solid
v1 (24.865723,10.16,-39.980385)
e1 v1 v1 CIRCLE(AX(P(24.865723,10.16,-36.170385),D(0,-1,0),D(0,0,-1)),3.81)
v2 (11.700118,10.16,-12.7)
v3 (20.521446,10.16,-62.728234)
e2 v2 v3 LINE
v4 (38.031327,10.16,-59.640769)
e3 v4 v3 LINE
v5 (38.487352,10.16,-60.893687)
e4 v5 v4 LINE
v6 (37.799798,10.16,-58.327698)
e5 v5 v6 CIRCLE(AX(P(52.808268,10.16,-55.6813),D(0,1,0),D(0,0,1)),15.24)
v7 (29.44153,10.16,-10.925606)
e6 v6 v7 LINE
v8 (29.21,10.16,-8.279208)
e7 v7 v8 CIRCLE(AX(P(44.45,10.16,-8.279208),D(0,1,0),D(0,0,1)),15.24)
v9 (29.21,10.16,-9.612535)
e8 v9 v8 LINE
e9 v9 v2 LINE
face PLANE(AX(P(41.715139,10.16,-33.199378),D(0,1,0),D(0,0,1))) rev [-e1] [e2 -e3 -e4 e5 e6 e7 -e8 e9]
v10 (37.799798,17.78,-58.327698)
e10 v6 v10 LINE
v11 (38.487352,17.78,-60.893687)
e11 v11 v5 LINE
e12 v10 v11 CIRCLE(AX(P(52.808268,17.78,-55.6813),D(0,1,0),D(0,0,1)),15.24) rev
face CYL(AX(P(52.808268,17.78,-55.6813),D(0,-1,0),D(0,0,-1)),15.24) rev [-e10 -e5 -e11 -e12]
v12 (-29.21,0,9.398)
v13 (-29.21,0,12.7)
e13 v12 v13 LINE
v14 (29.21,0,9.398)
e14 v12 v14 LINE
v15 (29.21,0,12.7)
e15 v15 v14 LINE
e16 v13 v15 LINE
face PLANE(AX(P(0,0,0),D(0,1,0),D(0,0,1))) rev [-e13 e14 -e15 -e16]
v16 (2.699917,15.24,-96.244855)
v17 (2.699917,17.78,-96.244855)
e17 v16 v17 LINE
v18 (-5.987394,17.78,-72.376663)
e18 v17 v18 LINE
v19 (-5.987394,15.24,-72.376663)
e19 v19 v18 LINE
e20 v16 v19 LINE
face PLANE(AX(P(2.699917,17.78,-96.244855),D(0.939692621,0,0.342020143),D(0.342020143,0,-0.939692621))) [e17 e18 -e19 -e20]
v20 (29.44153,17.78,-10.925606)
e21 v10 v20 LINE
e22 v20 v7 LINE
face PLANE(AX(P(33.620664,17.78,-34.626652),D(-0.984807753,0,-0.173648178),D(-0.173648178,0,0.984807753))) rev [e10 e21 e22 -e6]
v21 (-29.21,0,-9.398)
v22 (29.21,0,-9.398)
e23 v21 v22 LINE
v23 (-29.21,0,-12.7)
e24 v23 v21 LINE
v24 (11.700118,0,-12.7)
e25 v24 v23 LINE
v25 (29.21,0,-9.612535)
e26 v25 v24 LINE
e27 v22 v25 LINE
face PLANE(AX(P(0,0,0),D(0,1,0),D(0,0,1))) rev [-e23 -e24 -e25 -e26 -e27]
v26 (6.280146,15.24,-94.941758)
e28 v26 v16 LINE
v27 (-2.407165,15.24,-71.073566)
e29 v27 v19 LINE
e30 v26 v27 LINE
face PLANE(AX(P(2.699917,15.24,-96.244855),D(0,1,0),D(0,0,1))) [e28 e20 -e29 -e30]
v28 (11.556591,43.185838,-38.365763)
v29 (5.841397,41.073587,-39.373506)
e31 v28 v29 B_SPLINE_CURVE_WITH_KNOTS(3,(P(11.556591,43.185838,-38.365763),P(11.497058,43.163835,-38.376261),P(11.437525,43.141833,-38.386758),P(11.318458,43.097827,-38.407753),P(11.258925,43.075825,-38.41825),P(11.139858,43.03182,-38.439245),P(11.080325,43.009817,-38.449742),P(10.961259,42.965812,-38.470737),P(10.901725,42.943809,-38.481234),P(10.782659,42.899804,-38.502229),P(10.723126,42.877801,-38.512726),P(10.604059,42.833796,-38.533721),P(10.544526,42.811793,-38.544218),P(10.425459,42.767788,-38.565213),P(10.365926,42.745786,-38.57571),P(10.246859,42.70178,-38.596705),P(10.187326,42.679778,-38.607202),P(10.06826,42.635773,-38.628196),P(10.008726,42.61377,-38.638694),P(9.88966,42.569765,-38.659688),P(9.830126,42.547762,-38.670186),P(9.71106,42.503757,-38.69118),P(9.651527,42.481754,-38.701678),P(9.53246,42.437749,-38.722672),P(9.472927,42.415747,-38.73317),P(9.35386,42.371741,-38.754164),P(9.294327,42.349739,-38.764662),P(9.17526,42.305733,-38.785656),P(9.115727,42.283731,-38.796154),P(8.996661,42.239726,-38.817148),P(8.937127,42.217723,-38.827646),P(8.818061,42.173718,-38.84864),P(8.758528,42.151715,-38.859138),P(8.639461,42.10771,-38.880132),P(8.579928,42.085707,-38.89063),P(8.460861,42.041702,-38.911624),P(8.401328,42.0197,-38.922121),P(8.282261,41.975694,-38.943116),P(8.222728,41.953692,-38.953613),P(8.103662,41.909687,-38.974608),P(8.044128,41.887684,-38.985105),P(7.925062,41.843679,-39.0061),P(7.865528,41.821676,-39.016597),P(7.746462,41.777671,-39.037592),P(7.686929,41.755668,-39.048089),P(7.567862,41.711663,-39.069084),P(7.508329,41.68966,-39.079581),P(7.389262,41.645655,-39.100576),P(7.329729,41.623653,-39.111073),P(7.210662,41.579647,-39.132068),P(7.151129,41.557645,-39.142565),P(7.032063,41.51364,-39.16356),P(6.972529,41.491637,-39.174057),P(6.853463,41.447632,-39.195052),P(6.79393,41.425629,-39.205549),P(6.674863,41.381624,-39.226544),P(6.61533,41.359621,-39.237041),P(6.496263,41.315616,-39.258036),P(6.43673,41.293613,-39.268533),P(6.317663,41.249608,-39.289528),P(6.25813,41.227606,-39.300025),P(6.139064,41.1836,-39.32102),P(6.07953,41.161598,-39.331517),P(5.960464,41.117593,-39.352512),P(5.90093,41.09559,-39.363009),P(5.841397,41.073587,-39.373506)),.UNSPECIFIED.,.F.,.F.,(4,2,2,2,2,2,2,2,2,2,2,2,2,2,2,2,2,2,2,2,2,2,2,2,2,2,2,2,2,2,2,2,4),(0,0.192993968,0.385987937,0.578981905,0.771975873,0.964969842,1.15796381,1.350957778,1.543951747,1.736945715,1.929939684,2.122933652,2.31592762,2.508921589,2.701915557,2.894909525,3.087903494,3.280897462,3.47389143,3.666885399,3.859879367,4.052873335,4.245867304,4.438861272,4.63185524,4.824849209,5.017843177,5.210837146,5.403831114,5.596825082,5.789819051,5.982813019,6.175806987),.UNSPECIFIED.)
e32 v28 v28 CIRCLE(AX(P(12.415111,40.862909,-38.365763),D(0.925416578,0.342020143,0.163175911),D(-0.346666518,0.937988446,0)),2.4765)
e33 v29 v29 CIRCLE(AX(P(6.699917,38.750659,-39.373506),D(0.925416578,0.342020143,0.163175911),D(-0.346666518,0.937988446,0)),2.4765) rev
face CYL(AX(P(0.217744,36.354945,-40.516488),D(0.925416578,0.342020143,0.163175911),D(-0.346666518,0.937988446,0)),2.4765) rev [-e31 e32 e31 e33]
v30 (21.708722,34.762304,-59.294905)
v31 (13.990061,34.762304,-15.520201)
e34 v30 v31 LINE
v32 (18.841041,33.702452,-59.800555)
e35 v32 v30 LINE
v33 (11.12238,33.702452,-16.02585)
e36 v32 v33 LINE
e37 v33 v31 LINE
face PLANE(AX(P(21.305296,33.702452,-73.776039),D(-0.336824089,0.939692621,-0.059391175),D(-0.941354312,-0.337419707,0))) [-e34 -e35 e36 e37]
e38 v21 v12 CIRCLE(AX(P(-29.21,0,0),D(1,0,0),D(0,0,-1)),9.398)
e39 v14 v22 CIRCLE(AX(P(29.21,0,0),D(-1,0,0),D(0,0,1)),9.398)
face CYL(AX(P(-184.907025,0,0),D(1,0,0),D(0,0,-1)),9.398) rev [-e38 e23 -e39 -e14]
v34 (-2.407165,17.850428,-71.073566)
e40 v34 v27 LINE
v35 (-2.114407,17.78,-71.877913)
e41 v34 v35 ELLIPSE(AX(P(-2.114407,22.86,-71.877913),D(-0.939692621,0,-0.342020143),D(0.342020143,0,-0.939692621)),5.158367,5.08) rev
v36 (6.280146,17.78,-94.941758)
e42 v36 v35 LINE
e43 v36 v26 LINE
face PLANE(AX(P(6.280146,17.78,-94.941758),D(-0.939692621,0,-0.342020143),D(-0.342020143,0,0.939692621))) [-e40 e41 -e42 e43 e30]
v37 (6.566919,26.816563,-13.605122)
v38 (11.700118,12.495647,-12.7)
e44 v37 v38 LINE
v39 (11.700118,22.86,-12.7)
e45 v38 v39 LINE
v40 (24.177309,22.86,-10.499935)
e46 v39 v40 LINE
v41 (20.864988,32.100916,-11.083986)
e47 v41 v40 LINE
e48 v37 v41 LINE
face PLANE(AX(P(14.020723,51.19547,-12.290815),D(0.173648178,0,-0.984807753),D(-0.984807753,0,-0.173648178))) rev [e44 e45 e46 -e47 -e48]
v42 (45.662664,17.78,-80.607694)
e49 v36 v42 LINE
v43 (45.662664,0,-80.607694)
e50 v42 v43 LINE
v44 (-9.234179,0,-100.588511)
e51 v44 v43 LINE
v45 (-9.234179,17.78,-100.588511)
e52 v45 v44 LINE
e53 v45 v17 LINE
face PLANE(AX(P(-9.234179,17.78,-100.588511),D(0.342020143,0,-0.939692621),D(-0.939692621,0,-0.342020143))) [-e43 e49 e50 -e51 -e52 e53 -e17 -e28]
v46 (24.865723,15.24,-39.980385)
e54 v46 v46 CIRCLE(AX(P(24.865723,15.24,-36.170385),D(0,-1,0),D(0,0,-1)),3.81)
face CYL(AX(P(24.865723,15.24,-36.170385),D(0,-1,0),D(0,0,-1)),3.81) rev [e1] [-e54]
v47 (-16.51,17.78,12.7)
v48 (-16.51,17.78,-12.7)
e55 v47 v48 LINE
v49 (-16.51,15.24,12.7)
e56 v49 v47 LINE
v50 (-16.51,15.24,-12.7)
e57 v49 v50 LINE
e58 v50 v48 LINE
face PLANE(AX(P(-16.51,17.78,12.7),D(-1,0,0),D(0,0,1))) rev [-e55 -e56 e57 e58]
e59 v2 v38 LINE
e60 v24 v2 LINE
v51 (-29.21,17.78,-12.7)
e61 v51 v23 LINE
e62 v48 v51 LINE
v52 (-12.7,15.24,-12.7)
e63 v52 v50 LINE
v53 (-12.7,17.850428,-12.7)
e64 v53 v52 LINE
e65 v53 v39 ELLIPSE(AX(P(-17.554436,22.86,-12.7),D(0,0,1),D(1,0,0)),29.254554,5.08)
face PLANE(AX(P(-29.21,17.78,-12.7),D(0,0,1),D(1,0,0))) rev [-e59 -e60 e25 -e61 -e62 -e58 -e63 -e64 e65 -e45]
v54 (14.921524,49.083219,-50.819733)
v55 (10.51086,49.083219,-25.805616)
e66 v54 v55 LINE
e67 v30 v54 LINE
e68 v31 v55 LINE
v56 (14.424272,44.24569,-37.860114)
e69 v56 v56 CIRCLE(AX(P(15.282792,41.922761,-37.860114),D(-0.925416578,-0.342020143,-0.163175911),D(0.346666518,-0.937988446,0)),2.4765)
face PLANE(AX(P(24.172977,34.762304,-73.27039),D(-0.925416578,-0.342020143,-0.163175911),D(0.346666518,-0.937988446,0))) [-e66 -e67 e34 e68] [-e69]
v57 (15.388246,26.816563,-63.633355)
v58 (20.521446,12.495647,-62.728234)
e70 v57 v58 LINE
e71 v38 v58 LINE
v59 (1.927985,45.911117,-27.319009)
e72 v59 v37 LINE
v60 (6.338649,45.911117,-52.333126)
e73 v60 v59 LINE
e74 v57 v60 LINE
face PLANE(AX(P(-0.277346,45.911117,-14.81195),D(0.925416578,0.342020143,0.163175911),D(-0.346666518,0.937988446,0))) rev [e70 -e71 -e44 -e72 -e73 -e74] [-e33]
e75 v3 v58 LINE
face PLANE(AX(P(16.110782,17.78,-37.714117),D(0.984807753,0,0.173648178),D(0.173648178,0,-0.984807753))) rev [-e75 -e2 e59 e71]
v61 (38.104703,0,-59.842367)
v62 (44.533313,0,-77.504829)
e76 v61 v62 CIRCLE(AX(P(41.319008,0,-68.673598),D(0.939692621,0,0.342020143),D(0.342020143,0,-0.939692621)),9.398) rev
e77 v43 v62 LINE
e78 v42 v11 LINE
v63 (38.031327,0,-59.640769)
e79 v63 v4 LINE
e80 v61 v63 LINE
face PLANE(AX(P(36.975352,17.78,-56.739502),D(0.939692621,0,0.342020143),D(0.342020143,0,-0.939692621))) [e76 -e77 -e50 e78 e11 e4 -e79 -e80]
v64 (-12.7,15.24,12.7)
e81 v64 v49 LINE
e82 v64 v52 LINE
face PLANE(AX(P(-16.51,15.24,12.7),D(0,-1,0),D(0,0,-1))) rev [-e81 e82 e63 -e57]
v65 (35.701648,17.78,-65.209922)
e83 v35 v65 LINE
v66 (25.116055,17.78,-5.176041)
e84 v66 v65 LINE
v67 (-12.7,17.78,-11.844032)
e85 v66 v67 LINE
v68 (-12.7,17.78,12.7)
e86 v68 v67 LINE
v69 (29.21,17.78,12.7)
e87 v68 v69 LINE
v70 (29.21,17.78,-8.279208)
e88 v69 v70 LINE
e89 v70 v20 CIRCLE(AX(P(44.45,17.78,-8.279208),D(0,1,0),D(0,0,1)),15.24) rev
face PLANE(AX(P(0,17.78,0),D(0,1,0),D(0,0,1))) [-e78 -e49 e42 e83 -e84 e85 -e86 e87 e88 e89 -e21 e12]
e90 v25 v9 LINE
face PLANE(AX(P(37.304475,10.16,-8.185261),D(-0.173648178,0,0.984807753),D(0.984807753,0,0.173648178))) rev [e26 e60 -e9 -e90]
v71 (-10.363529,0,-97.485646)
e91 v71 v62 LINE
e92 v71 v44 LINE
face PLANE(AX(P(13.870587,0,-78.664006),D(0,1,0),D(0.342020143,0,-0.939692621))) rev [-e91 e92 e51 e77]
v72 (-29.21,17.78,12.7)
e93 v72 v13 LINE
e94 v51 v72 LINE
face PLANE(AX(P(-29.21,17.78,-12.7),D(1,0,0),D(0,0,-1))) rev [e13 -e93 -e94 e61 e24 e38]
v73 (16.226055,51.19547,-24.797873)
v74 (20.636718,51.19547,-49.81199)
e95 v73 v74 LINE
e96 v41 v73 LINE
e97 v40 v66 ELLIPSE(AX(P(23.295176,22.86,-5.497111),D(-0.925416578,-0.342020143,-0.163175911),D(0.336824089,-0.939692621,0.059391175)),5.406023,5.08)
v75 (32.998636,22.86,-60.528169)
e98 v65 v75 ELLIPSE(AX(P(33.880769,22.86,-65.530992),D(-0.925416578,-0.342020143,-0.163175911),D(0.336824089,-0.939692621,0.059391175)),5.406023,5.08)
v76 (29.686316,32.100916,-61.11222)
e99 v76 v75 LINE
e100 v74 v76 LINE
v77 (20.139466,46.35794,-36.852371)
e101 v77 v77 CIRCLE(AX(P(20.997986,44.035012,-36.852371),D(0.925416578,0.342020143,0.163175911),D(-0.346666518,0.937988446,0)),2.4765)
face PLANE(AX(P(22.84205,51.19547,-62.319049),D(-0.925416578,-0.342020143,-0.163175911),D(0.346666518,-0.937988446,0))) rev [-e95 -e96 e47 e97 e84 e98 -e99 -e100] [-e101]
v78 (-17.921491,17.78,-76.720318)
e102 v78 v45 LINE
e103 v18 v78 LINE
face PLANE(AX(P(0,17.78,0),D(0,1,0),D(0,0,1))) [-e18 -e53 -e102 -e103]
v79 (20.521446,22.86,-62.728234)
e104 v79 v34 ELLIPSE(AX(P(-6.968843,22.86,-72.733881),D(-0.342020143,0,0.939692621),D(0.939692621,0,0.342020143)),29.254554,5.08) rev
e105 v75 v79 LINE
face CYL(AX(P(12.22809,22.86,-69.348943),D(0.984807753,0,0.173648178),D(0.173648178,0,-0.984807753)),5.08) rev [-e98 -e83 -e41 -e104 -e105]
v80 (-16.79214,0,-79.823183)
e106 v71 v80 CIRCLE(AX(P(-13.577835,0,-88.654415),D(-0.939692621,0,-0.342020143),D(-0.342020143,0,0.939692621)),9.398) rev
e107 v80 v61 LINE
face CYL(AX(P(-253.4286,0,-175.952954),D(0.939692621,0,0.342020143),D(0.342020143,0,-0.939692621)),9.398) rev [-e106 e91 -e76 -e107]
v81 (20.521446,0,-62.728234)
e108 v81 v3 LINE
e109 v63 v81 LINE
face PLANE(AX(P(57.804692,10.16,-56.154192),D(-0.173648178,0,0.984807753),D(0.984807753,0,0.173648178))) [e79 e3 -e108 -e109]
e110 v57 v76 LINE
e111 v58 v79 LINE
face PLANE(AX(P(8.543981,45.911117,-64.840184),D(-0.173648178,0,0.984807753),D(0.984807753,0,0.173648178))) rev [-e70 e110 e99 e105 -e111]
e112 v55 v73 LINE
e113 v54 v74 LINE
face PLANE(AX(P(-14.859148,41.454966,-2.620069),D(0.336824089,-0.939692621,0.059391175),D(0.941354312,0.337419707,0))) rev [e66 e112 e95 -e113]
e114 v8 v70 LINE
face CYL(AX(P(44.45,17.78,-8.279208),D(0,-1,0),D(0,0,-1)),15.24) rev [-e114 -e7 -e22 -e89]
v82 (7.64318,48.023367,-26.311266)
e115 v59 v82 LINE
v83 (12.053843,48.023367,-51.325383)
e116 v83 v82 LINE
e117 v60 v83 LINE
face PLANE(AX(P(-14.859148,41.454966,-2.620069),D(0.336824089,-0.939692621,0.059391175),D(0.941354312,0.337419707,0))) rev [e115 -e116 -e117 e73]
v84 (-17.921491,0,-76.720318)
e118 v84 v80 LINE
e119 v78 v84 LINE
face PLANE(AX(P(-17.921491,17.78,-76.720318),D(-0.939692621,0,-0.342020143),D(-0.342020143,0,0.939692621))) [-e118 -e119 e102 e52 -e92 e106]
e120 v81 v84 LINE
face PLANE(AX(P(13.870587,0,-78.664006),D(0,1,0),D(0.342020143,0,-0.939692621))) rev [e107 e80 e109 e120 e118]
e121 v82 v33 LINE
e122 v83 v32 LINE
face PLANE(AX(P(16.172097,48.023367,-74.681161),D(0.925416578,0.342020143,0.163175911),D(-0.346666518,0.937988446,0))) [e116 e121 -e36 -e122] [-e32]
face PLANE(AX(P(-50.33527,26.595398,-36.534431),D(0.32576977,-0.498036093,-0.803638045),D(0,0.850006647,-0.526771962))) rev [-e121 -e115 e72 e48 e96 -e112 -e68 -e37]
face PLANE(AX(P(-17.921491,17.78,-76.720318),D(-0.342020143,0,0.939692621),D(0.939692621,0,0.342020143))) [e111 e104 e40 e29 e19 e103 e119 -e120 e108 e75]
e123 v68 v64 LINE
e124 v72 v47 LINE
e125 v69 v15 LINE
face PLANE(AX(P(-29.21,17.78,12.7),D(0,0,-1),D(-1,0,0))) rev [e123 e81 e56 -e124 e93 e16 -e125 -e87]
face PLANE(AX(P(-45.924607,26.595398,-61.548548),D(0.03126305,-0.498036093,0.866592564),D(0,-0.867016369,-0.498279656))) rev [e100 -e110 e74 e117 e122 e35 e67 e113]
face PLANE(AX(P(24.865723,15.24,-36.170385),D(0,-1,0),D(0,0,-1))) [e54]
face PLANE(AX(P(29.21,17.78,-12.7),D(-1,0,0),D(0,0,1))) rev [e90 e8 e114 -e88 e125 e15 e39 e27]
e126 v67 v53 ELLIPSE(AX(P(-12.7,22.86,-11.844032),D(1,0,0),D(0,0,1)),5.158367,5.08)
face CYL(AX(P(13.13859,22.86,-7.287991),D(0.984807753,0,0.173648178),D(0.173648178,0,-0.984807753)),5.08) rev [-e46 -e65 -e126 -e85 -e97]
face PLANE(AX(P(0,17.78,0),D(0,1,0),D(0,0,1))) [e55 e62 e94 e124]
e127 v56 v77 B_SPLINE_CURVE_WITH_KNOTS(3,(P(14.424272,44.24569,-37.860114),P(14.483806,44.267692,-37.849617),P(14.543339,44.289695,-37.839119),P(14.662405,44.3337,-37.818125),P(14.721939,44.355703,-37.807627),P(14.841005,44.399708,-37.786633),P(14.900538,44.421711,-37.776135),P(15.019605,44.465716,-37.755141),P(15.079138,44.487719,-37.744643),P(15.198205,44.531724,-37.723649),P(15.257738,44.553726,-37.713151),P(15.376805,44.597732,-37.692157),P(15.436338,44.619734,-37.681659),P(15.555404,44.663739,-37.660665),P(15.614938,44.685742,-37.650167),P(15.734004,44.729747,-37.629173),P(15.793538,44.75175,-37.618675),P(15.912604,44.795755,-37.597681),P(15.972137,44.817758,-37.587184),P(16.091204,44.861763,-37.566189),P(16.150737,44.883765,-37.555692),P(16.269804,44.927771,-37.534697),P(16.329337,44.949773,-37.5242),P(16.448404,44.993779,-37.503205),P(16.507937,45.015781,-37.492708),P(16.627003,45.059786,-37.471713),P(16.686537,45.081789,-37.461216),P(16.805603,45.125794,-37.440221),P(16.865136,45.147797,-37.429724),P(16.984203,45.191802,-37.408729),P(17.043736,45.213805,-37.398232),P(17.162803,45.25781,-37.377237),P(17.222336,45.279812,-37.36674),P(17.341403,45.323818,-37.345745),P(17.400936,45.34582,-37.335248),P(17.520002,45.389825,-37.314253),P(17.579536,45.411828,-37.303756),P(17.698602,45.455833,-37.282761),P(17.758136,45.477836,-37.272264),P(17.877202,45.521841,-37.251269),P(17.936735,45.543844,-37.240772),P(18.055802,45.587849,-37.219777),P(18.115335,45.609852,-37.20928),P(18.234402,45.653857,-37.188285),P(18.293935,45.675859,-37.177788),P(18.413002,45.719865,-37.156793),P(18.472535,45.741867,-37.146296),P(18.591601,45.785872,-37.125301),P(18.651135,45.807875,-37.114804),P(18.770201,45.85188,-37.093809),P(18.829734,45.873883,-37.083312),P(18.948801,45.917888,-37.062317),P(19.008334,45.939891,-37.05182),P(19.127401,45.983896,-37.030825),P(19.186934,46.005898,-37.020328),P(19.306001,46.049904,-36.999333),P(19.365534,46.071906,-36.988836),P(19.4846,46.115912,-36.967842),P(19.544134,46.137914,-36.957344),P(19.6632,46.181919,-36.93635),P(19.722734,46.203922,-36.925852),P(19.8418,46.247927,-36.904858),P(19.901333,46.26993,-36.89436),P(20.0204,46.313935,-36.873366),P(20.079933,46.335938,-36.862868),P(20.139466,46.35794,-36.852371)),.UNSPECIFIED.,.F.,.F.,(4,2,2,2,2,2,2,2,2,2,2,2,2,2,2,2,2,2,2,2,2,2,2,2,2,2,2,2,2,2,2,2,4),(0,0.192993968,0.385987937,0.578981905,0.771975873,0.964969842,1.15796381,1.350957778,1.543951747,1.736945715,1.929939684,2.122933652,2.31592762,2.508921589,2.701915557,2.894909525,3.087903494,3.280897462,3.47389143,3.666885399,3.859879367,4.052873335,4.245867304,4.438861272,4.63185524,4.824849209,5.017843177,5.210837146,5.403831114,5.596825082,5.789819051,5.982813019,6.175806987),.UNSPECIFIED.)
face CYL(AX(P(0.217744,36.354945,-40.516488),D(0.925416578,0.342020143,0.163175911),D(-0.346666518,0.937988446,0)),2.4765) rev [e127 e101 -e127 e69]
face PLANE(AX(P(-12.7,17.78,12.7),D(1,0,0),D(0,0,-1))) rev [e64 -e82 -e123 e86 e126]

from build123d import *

# Parameters (mm, degrees)
SKETCH2_W           = 58.42
SKETCH2_H           = 25.4
BOSS_EXTRUDE1_DEPTH = 17.78
CUT_EXTRUDE2_DEPTH  = 63.372388122
SKETCH6_W           = 3.81
SKETCH6_H           = 2.54
CUT_EXTRUDE3_DEPTH  = 25.4
CUT_EXTRUDE4_DEPTH  = 25.4
SKETCH8_W           = 17.78
SKETCH8_H           = 17.78
BOSS_EXTRUDE2_DEPTH = 25.4
SKETCH13_W          = 58.42
SKETCH13_H          = 9.398
CUT_EXTRUDE6_REACH  = 59.763
SKETCH15_W          = 25.4
SKETCH15_H          = 10.16
MIRROR14_START      = 9.31703521
MIRROR14_OUTLINE_W  = 7.62
MIRROR14_OUTLINE_H  = 25.4
MIRROR14_DEPTH      = 17.78
CUT_EXTRUDE7_DEPTH  = 25.4
BOSS_EXTRUDE3_DEPTH = 35.56
CUT_EXTRUDE8_REACH  = 128.018
CUT_EXTRUDE9_REACH  = 111.199
CUT_EXTRUDE10_REACH = 128.018
SKETCH25_R          = 2.4765
SKETCH26_R          = 3.81
CUT_EXTRUDE11_DEPTH = 5.08
FILLET1_R           = 15.24
FILLET2_R           = 5.08


with BuildPart() as part:
    # Sketch2 → Boss-Extrude1 (new body)
    with BuildSketch(Plane(origin=(0, 0, 0), x_dir=(1, 0, 0), z_dir=(0, 1, 0))):
        Rectangle(SKETCH2_W, SKETCH2_H)
    boss_extrude1 = extrude(amount=BOSS_EXTRUDE1_DEPTH)

    # Sketch4 → Cut-Extrude2 (cut, symmetric)
    with BuildSketch(Plane.ZY.offset(29.21)):
        with BuildLine():
            Line((-9.398, -66.725655712), (-9.398, 0))
            ThreePointArc((-9.398, 0), (0, 9.398), (9.398, 0))
            Line((9.398, 0), (9.398, -66.725655712))
            Line((9.398, -66.725655712), (9.398, -200.176967137))
            Line((9.398, -200.176967137), (-9.398, -200.176967137))
            Line((-9.398, -200.176967137), (-9.398, -66.725655712))
        make_face()
    cut_extrude2 = extrude(amount=CUT_EXTRUDE2_DEPTH, both=True, mode=Mode.SUBTRACT)

    # Sketch6 → Cut-Extrude3 (cut)
    with BuildSketch(Plane(origin=(0, 0, -12.7), x_dir=(-1, 0, 0), z_dir=(0, 0, -1))):
        with Locations((14.605, 16.51)):
            Rectangle(SKETCH6_W, SKETCH6_H)
    cut_extrude3 = extrude(amount=-CUT_EXTRUDE3_DEPTH, mode=Mode.SUBTRACT)

    # Sketch7 → Cut-Extrude4 (cut)
    with BuildSketch(Plane(origin=(0, 17.78, 0), x_dir=(1, 0, 0), z_dir=(0, 1, 0))):
        Polygon((11.700118151, 12.7), (29.21, 9.612535401), (29.21, 12.7), align=None)
    extrude(amount=-CUT_EXTRUDE4_DEPTH, mode=Mode.SUBTRACT)

    # Sketch8 → Boss-Extrude2 (add)
    with BuildSketch(Plane(origin=(2.524629641, 0, -14.317886186), x_dir=(-0.9848077530122094, 0, -0.17364817766692317), z_dir=(0.17364817766692317, 0, -0.9848077530122094))):
        with Locations((-18.20703521, 8.89)):
            Rectangle(SKETCH8_W, SKETCH8_H)
    extrude(amount=BOSS_EXTRUDE2_DEPTH)

    # Sketch13 → Cut-Revolve2 (revolve, cut)
    with BuildSketch(Plane.XZ):
        with Locations((0, 4.699)):
            Rectangle(SKETCH13_W, SKETCH13_H)
    revolve(axis=Axis((28.421300087, 0, 0), (-1, 0, 0)), mode=Mode.SUBTRACT)

    # Sketch15 → Cut-Extrude6 (cut, up to next)
    with BuildSketch(Plane(origin=(9.17548851, 0, 1.617886186), x_dir=(-0.17364817766692317, 0, 0.9848077530122095), z_dir=(-0.9848077530122095, 0, -0.17364817766692317)), mode=Mode.PRIVATE) as cut_extrude6_sk1:
        with Locations((-27.238762659, 5.08)):
            Rectangle(SKETCH15_W, SKETCH15_H)
    cut_extrude6_tool1 = extrude(cut_extrude6_sk1.sketch, amount=-CUT_EXTRUDE6_REACH, mode=Mode.PRIVATE) & part.part
    cut_extrude6 = cut_extrude6_tool1.solids().sort_by_distance((13.90545, 5.08, -25.207058))[0]
    add(cut_extrude6, mode=Mode.SUBTRACT)

    # Mirror14: read off the stored shape, not the designer's step
    # Mirror14 outline → Mirror14 (add)
    with BuildSketch(Plane(origin=(0, 0, 0), x_dir=(0, 1, 0), z_dir=(0.9848077530122094, 0, 0.17364817766692306)).offset(MIRROR14_START)):
        with Locations((13.97, -52.638762659)):
            Rectangle(MIRROR14_OUTLINE_W, MIRROR14_OUTLINE_H)
    extrude(amount=MIRROR14_DEPTH)

    # Mirror15: Boss-Extrude1 across plane
    add(boss_extrude1.mirror(Plane(origin=(6.935293354, 0, -39.332003112), x_dir=(0.9848077530122092, 0, 0.17364817766692314), z_dir=(0.17364817766692314, 0, -0.9848077530122094))))

    # Mirror16: Cut-Extrude2, Cut-Extrude3, Cut-Extrude6 across plane
    add(cut_extrude2.mirror(Plane(origin=(6.935293354, 0, -39.332003112), x_dir=(0.9848077530122092, 0, 0.17364817766692314), z_dir=(0.17364817766692314, 0, -0.9848077530122094))), mode=Mode.SUBTRACT)
    add(cut_extrude3.mirror(Plane(origin=(6.935293354, 0, -39.332003112), x_dir=(0.9848077530122092, 0, 0.17364817766692314), z_dir=(0.17364817766692314, 0, -0.9848077530122094))), mode=Mode.SUBTRACT)
    add(cut_extrude6.mirror(Plane(origin=(6.935293354, 0, -39.332003112), x_dir=(0.9848077530122092, 0, 0.17364817766692314), z_dir=(0.17364817766692314, 0, -0.9848077530122094))), mode=Mode.SUBTRACT)

    # Sketch21 → Cut-Extrude7 (cut, symmetric)
    with BuildSketch(Plane(origin=(6.935293354, 0, -39.332003112), x_dir=(-0.9848077530122094, 0, -0.17364817766692314), z_dir=(0.17364817766692314, 0, -0.9848077530122094))):
        Polygon((-23.83567521, 17.78), (-9.31703521, 12.495647198), (-9.31703521, 17.78), align=None)
    extrude(amount=CUT_EXTRUDE7_DEPTH, both=True, mode=Mode.SUBTRACT)

    # Sketch22 → Boss-Extrude3 (add)
    with BuildSketch(Plane(origin=(-2.881682913, 8.039496752, -0.508118447), x_dir=(-0.19346054761682988, -0.00733712504048707, 0.9810806200878379), z_dir=(-0.33682408883345943, 0.9396926207859106, -0.059391174613881166))):
        Polygon((-65.934673992, 27.071104434), (-15.146364467, 28.160882213), (-14.814917266, 12.714023803), (-65.603226791, 11.624246024), align=None)
    extrude(amount=BOSS_EXTRUDE3_DEPTH)

    # Sketch23 → Cut-Extrude8 (cut, up to next)
    with BuildSketch(Plane(origin=(26.355240658, 9.740503248, 4.647140011), x_dir=(0.3782029195796047, -0.8606292095735792, -0.3409984094540904), z_dir=(0.9254165783983268, 0.3420201433256624, 0.16317591116652866)), mode=Mode.PRIVATE) as cut_extrude8_sk1:
        Polygon((-19.269639975, 65.921874736), (4.43963551, 69.395008187), (-14.170689985, 77.55332817), align=None)
    cut_extrude8_tool1 = extrude(cut_extrude8_sk1.sketch, amount=-CUT_EXTRUDE8_REACH, mode=Mode.PRIVATE) & part.part
    # Sketch23 → Cut-Extrude8 (cut, up to next)
    with BuildSketch(Plane(origin=(26.355240658, 9.740503248, 4.647140011), x_dir=(0.3782029195796047, -0.8606292095735792, -0.3409984094540904), z_dir=(0.9254165783983268, 0.3420201433256624, 0.16317591116652866)), mode=Mode.PRIVATE) as cut_extrude8_sk2:
        Polygon((-15.956164448, 22.869194448), (-34.566489944, 31.027514432), (-29.467539954, 42.658967866), align=None)
    cut_extrude8_tool2 = extrude(cut_extrude8_sk2.sketch, amount=-CUT_EXTRUDE8_REACH, mode=Mode.PRIVATE) & part.part
    add(cut_extrude8_tool1.solids().sort_by_distance((24.388361, 44.830618, -57.747753))[0], mode=Mode.SUBTRACT)
    add(cut_extrude8_tool2.solids().sort_by_distance((17.037255, 44.830618, -16.057558))[0], mode=Mode.SUBTRACT)

    # Cut-Extrude9: up to this plane
    cut_extrude9_end = Plane(origin=(-45.924606639, 26.595398182, -61.548547649), z_dir=(0.031263049894144905, -0.49803609294534235, 0.8665925639163162))
    # Sketch24 → Cut-Extrude9 (cut, up to the surface)
    with BuildSketch(Plane(origin=(2.524629641, 0, -14.317886186), x_dir=(-0.9848077530122095, 0, -0.1736481776669232), z_dir=(0.1736481776669232, 0, -0.9848077530122095)), mode=Mode.PRIVATE) as cut_extrude9_sk1:
        Polygon((-8.170546151, 33.702451643), (-11.082465645, 34.762303663), (-5.87007866, 49.083219204), (-2.958159167, 48.023367184), align=None)
    cut_extrude9_tool1 = split(extrude(cut_extrude9_sk1.sketch, amount=CUT_EXTRUDE9_REACH, mode=Mode.PRIVATE), bisect_by=cut_extrude9_end, keep=Keep.BOTH, mode=Mode.PRIVATE)
    add(cut_extrude9_tool1.solids().sort_by_distance((9.438288, 41.392835, -13.098822))[0], mode=Mode.SUBTRACT)

    # Cut-Extrude10: up to this face of the body (flat: up to its plane)
    cut_extrude10_end = Plane(part.part.faces().sort_by_distance((10.739934643, 27.479568088, -38.661142201))[0])
    # Sketch25 → Cut-Extrude10 (cut, up to the picked face)
    with BuildSketch(Plane(origin=(26.355240658, 9.740503248, 4.647140011), x_dir=(0.3782029195796047, -0.8606292095735792, -0.3409984094540904), z_dir=(0.9254165783983268, 0.3420201433256624, 0.16317591116652866)), mode=Mode.PRIVATE) as cut_extrude10_sk1:
        with Locations(Location((-17.389717904, 51.231051307, 0), (0, 0, 159.779686777))):
            Circle(SKETCH25_R)
    cut_extrude10_tool1 = split(extrude(cut_extrude10_sk1.sketch, amount=-CUT_EXTRUDE10_REACH, mode=Mode.PRIVATE), bisect_by=cut_extrude10_end, keep=Keep.BOTH, mode=Mode.PRIVATE)
    add(cut_extrude10_tool1.solids().sort_by(Axis((20.997986, 44.035012, -36.852371), (-0.9254165783983268, -0.3420201433256624, -0.16317591116652866)))[0], mode=Mode.SUBTRACT)

    # Sketch26 → Cut-Extrude11 (cut)
    with BuildSketch(Plane.XZ.offset(-10.16)):
        with Locations(Location((24.865722788, -36.170384627, 0), (0, 0, 270))):
            Circle(SKETCH26_R)
    extrude(amount=-CUT_EXTRUDE11_DEPTH, mode=Mode.SUBTRACT)

    # Fillet1
    fillet1_edges = [part.edges().sort_by_distance(p)[0] for p in [
        (29.21, 13.97, -9.612535401),
        (38.031327425, 13.97, -59.640769254),
    ]]
    fillet(fillet1_edges, radius=FILLET1_R)

    # Fillet2
    # the kernel refuses this fillet: 5.08 mm, written as the material it adds along each edge
    with BuildSketch(Plane(origin=(-16.999729813, 17.78, -69.344229422), x_dir=(0.17364817766692311, 0, -0.9848077530122094), z_dir=(0.9848077530122094, 0, 0.17364817766692314))) as fillet2_piece_1_section:
        with BuildLine():
            CenterArc((FILLET2_R, FILLET2_R), FILLET2_R, 180, 90)
            Line((0, FILLET2_R), (0, 0))
            Line((0, 0), (FILLET2_R, 0))
        make_face()
    fillet2_piece_1 = extrude(amount=65.31864, mode=Mode.PRIVATE)
    fillet2_piece_1 = split(fillet2_piece_1, bisect_by=Plane(origin=(28.757814695, 34.691304915, -61.275939754), z_dir=(-0.925416578398327, -0.34202014332566266, -0.16317591116652855)), keep=Keep.TOP, mode=Mode.PRIVATE)
    fillet2_piece_1 = split(fillet2_piece_1, bisect_by=Plane(origin=(-4.669969149, 17.78, -64.856563545), z_dir=(0.9396926207859135, 0, 0.342020143325655)), keep=Keep.TOP, mode=Mode.PRIVATE)
    fillet2_piece_1 = split(fillet2_piece_1, bisect_by=Plane(origin=(-14.73692606, 17.78, -75.561231638), z_dir=(0.342020143325655, 0, -0.9396926207859134)), keep=Keep.TOP, mode=Mode.PRIVATE)
    add(fillet2_piece_1)
    with BuildSketch(Plane(origin=(-25.821057238, 17.78, -19.315995569), x_dir=(-0.17364817766692314, 0, 0.9848077530122094), z_dir=(0.9848077530122094, 0, 0.17364817766692314))) as fillet2_piece_2_section:
        with BuildLine():
            CenterArc((FILLET2_R, -FILLET2_R), FILLET2_R, 90, 90)
            Line((0, -FILLET2_R), (0, 0))
            Line((0, 0), (FILLET2_R, 0))
        make_face()
    fillet2_piece_2 = extrude(amount=65.31864, mode=Mode.PRIVATE)
    fillet2_piece_2 = split(fillet2_piece_2, bisect_by=Plane(origin=(-12.7, 17.78, -19.315995569), z_dir=(1, 0, 0)), keep=Keep.TOP, mode=Mode.PRIVATE)
    fillet2_piece_2 = split(fillet2_piece_2, bisect_by=Plane(origin=(-25.821057238, 17.78, -12.7), z_dir=(0, 0, 1)), keep=Keep.TOP, mode=Mode.PRIVATE)
    fillet2_piece_2 = split(fillet2_piece_2, bisect_by=Plane(origin=(19.93648727, 34.691304915, -11.247705901), z_dir=(-0.925416578398327, -0.34202014332566266, -0.16317591116652855)), keep=Keep.TOP, mode=Mode.PRIVATE)
    add(fillet2_piece_2)


solid = part.part
